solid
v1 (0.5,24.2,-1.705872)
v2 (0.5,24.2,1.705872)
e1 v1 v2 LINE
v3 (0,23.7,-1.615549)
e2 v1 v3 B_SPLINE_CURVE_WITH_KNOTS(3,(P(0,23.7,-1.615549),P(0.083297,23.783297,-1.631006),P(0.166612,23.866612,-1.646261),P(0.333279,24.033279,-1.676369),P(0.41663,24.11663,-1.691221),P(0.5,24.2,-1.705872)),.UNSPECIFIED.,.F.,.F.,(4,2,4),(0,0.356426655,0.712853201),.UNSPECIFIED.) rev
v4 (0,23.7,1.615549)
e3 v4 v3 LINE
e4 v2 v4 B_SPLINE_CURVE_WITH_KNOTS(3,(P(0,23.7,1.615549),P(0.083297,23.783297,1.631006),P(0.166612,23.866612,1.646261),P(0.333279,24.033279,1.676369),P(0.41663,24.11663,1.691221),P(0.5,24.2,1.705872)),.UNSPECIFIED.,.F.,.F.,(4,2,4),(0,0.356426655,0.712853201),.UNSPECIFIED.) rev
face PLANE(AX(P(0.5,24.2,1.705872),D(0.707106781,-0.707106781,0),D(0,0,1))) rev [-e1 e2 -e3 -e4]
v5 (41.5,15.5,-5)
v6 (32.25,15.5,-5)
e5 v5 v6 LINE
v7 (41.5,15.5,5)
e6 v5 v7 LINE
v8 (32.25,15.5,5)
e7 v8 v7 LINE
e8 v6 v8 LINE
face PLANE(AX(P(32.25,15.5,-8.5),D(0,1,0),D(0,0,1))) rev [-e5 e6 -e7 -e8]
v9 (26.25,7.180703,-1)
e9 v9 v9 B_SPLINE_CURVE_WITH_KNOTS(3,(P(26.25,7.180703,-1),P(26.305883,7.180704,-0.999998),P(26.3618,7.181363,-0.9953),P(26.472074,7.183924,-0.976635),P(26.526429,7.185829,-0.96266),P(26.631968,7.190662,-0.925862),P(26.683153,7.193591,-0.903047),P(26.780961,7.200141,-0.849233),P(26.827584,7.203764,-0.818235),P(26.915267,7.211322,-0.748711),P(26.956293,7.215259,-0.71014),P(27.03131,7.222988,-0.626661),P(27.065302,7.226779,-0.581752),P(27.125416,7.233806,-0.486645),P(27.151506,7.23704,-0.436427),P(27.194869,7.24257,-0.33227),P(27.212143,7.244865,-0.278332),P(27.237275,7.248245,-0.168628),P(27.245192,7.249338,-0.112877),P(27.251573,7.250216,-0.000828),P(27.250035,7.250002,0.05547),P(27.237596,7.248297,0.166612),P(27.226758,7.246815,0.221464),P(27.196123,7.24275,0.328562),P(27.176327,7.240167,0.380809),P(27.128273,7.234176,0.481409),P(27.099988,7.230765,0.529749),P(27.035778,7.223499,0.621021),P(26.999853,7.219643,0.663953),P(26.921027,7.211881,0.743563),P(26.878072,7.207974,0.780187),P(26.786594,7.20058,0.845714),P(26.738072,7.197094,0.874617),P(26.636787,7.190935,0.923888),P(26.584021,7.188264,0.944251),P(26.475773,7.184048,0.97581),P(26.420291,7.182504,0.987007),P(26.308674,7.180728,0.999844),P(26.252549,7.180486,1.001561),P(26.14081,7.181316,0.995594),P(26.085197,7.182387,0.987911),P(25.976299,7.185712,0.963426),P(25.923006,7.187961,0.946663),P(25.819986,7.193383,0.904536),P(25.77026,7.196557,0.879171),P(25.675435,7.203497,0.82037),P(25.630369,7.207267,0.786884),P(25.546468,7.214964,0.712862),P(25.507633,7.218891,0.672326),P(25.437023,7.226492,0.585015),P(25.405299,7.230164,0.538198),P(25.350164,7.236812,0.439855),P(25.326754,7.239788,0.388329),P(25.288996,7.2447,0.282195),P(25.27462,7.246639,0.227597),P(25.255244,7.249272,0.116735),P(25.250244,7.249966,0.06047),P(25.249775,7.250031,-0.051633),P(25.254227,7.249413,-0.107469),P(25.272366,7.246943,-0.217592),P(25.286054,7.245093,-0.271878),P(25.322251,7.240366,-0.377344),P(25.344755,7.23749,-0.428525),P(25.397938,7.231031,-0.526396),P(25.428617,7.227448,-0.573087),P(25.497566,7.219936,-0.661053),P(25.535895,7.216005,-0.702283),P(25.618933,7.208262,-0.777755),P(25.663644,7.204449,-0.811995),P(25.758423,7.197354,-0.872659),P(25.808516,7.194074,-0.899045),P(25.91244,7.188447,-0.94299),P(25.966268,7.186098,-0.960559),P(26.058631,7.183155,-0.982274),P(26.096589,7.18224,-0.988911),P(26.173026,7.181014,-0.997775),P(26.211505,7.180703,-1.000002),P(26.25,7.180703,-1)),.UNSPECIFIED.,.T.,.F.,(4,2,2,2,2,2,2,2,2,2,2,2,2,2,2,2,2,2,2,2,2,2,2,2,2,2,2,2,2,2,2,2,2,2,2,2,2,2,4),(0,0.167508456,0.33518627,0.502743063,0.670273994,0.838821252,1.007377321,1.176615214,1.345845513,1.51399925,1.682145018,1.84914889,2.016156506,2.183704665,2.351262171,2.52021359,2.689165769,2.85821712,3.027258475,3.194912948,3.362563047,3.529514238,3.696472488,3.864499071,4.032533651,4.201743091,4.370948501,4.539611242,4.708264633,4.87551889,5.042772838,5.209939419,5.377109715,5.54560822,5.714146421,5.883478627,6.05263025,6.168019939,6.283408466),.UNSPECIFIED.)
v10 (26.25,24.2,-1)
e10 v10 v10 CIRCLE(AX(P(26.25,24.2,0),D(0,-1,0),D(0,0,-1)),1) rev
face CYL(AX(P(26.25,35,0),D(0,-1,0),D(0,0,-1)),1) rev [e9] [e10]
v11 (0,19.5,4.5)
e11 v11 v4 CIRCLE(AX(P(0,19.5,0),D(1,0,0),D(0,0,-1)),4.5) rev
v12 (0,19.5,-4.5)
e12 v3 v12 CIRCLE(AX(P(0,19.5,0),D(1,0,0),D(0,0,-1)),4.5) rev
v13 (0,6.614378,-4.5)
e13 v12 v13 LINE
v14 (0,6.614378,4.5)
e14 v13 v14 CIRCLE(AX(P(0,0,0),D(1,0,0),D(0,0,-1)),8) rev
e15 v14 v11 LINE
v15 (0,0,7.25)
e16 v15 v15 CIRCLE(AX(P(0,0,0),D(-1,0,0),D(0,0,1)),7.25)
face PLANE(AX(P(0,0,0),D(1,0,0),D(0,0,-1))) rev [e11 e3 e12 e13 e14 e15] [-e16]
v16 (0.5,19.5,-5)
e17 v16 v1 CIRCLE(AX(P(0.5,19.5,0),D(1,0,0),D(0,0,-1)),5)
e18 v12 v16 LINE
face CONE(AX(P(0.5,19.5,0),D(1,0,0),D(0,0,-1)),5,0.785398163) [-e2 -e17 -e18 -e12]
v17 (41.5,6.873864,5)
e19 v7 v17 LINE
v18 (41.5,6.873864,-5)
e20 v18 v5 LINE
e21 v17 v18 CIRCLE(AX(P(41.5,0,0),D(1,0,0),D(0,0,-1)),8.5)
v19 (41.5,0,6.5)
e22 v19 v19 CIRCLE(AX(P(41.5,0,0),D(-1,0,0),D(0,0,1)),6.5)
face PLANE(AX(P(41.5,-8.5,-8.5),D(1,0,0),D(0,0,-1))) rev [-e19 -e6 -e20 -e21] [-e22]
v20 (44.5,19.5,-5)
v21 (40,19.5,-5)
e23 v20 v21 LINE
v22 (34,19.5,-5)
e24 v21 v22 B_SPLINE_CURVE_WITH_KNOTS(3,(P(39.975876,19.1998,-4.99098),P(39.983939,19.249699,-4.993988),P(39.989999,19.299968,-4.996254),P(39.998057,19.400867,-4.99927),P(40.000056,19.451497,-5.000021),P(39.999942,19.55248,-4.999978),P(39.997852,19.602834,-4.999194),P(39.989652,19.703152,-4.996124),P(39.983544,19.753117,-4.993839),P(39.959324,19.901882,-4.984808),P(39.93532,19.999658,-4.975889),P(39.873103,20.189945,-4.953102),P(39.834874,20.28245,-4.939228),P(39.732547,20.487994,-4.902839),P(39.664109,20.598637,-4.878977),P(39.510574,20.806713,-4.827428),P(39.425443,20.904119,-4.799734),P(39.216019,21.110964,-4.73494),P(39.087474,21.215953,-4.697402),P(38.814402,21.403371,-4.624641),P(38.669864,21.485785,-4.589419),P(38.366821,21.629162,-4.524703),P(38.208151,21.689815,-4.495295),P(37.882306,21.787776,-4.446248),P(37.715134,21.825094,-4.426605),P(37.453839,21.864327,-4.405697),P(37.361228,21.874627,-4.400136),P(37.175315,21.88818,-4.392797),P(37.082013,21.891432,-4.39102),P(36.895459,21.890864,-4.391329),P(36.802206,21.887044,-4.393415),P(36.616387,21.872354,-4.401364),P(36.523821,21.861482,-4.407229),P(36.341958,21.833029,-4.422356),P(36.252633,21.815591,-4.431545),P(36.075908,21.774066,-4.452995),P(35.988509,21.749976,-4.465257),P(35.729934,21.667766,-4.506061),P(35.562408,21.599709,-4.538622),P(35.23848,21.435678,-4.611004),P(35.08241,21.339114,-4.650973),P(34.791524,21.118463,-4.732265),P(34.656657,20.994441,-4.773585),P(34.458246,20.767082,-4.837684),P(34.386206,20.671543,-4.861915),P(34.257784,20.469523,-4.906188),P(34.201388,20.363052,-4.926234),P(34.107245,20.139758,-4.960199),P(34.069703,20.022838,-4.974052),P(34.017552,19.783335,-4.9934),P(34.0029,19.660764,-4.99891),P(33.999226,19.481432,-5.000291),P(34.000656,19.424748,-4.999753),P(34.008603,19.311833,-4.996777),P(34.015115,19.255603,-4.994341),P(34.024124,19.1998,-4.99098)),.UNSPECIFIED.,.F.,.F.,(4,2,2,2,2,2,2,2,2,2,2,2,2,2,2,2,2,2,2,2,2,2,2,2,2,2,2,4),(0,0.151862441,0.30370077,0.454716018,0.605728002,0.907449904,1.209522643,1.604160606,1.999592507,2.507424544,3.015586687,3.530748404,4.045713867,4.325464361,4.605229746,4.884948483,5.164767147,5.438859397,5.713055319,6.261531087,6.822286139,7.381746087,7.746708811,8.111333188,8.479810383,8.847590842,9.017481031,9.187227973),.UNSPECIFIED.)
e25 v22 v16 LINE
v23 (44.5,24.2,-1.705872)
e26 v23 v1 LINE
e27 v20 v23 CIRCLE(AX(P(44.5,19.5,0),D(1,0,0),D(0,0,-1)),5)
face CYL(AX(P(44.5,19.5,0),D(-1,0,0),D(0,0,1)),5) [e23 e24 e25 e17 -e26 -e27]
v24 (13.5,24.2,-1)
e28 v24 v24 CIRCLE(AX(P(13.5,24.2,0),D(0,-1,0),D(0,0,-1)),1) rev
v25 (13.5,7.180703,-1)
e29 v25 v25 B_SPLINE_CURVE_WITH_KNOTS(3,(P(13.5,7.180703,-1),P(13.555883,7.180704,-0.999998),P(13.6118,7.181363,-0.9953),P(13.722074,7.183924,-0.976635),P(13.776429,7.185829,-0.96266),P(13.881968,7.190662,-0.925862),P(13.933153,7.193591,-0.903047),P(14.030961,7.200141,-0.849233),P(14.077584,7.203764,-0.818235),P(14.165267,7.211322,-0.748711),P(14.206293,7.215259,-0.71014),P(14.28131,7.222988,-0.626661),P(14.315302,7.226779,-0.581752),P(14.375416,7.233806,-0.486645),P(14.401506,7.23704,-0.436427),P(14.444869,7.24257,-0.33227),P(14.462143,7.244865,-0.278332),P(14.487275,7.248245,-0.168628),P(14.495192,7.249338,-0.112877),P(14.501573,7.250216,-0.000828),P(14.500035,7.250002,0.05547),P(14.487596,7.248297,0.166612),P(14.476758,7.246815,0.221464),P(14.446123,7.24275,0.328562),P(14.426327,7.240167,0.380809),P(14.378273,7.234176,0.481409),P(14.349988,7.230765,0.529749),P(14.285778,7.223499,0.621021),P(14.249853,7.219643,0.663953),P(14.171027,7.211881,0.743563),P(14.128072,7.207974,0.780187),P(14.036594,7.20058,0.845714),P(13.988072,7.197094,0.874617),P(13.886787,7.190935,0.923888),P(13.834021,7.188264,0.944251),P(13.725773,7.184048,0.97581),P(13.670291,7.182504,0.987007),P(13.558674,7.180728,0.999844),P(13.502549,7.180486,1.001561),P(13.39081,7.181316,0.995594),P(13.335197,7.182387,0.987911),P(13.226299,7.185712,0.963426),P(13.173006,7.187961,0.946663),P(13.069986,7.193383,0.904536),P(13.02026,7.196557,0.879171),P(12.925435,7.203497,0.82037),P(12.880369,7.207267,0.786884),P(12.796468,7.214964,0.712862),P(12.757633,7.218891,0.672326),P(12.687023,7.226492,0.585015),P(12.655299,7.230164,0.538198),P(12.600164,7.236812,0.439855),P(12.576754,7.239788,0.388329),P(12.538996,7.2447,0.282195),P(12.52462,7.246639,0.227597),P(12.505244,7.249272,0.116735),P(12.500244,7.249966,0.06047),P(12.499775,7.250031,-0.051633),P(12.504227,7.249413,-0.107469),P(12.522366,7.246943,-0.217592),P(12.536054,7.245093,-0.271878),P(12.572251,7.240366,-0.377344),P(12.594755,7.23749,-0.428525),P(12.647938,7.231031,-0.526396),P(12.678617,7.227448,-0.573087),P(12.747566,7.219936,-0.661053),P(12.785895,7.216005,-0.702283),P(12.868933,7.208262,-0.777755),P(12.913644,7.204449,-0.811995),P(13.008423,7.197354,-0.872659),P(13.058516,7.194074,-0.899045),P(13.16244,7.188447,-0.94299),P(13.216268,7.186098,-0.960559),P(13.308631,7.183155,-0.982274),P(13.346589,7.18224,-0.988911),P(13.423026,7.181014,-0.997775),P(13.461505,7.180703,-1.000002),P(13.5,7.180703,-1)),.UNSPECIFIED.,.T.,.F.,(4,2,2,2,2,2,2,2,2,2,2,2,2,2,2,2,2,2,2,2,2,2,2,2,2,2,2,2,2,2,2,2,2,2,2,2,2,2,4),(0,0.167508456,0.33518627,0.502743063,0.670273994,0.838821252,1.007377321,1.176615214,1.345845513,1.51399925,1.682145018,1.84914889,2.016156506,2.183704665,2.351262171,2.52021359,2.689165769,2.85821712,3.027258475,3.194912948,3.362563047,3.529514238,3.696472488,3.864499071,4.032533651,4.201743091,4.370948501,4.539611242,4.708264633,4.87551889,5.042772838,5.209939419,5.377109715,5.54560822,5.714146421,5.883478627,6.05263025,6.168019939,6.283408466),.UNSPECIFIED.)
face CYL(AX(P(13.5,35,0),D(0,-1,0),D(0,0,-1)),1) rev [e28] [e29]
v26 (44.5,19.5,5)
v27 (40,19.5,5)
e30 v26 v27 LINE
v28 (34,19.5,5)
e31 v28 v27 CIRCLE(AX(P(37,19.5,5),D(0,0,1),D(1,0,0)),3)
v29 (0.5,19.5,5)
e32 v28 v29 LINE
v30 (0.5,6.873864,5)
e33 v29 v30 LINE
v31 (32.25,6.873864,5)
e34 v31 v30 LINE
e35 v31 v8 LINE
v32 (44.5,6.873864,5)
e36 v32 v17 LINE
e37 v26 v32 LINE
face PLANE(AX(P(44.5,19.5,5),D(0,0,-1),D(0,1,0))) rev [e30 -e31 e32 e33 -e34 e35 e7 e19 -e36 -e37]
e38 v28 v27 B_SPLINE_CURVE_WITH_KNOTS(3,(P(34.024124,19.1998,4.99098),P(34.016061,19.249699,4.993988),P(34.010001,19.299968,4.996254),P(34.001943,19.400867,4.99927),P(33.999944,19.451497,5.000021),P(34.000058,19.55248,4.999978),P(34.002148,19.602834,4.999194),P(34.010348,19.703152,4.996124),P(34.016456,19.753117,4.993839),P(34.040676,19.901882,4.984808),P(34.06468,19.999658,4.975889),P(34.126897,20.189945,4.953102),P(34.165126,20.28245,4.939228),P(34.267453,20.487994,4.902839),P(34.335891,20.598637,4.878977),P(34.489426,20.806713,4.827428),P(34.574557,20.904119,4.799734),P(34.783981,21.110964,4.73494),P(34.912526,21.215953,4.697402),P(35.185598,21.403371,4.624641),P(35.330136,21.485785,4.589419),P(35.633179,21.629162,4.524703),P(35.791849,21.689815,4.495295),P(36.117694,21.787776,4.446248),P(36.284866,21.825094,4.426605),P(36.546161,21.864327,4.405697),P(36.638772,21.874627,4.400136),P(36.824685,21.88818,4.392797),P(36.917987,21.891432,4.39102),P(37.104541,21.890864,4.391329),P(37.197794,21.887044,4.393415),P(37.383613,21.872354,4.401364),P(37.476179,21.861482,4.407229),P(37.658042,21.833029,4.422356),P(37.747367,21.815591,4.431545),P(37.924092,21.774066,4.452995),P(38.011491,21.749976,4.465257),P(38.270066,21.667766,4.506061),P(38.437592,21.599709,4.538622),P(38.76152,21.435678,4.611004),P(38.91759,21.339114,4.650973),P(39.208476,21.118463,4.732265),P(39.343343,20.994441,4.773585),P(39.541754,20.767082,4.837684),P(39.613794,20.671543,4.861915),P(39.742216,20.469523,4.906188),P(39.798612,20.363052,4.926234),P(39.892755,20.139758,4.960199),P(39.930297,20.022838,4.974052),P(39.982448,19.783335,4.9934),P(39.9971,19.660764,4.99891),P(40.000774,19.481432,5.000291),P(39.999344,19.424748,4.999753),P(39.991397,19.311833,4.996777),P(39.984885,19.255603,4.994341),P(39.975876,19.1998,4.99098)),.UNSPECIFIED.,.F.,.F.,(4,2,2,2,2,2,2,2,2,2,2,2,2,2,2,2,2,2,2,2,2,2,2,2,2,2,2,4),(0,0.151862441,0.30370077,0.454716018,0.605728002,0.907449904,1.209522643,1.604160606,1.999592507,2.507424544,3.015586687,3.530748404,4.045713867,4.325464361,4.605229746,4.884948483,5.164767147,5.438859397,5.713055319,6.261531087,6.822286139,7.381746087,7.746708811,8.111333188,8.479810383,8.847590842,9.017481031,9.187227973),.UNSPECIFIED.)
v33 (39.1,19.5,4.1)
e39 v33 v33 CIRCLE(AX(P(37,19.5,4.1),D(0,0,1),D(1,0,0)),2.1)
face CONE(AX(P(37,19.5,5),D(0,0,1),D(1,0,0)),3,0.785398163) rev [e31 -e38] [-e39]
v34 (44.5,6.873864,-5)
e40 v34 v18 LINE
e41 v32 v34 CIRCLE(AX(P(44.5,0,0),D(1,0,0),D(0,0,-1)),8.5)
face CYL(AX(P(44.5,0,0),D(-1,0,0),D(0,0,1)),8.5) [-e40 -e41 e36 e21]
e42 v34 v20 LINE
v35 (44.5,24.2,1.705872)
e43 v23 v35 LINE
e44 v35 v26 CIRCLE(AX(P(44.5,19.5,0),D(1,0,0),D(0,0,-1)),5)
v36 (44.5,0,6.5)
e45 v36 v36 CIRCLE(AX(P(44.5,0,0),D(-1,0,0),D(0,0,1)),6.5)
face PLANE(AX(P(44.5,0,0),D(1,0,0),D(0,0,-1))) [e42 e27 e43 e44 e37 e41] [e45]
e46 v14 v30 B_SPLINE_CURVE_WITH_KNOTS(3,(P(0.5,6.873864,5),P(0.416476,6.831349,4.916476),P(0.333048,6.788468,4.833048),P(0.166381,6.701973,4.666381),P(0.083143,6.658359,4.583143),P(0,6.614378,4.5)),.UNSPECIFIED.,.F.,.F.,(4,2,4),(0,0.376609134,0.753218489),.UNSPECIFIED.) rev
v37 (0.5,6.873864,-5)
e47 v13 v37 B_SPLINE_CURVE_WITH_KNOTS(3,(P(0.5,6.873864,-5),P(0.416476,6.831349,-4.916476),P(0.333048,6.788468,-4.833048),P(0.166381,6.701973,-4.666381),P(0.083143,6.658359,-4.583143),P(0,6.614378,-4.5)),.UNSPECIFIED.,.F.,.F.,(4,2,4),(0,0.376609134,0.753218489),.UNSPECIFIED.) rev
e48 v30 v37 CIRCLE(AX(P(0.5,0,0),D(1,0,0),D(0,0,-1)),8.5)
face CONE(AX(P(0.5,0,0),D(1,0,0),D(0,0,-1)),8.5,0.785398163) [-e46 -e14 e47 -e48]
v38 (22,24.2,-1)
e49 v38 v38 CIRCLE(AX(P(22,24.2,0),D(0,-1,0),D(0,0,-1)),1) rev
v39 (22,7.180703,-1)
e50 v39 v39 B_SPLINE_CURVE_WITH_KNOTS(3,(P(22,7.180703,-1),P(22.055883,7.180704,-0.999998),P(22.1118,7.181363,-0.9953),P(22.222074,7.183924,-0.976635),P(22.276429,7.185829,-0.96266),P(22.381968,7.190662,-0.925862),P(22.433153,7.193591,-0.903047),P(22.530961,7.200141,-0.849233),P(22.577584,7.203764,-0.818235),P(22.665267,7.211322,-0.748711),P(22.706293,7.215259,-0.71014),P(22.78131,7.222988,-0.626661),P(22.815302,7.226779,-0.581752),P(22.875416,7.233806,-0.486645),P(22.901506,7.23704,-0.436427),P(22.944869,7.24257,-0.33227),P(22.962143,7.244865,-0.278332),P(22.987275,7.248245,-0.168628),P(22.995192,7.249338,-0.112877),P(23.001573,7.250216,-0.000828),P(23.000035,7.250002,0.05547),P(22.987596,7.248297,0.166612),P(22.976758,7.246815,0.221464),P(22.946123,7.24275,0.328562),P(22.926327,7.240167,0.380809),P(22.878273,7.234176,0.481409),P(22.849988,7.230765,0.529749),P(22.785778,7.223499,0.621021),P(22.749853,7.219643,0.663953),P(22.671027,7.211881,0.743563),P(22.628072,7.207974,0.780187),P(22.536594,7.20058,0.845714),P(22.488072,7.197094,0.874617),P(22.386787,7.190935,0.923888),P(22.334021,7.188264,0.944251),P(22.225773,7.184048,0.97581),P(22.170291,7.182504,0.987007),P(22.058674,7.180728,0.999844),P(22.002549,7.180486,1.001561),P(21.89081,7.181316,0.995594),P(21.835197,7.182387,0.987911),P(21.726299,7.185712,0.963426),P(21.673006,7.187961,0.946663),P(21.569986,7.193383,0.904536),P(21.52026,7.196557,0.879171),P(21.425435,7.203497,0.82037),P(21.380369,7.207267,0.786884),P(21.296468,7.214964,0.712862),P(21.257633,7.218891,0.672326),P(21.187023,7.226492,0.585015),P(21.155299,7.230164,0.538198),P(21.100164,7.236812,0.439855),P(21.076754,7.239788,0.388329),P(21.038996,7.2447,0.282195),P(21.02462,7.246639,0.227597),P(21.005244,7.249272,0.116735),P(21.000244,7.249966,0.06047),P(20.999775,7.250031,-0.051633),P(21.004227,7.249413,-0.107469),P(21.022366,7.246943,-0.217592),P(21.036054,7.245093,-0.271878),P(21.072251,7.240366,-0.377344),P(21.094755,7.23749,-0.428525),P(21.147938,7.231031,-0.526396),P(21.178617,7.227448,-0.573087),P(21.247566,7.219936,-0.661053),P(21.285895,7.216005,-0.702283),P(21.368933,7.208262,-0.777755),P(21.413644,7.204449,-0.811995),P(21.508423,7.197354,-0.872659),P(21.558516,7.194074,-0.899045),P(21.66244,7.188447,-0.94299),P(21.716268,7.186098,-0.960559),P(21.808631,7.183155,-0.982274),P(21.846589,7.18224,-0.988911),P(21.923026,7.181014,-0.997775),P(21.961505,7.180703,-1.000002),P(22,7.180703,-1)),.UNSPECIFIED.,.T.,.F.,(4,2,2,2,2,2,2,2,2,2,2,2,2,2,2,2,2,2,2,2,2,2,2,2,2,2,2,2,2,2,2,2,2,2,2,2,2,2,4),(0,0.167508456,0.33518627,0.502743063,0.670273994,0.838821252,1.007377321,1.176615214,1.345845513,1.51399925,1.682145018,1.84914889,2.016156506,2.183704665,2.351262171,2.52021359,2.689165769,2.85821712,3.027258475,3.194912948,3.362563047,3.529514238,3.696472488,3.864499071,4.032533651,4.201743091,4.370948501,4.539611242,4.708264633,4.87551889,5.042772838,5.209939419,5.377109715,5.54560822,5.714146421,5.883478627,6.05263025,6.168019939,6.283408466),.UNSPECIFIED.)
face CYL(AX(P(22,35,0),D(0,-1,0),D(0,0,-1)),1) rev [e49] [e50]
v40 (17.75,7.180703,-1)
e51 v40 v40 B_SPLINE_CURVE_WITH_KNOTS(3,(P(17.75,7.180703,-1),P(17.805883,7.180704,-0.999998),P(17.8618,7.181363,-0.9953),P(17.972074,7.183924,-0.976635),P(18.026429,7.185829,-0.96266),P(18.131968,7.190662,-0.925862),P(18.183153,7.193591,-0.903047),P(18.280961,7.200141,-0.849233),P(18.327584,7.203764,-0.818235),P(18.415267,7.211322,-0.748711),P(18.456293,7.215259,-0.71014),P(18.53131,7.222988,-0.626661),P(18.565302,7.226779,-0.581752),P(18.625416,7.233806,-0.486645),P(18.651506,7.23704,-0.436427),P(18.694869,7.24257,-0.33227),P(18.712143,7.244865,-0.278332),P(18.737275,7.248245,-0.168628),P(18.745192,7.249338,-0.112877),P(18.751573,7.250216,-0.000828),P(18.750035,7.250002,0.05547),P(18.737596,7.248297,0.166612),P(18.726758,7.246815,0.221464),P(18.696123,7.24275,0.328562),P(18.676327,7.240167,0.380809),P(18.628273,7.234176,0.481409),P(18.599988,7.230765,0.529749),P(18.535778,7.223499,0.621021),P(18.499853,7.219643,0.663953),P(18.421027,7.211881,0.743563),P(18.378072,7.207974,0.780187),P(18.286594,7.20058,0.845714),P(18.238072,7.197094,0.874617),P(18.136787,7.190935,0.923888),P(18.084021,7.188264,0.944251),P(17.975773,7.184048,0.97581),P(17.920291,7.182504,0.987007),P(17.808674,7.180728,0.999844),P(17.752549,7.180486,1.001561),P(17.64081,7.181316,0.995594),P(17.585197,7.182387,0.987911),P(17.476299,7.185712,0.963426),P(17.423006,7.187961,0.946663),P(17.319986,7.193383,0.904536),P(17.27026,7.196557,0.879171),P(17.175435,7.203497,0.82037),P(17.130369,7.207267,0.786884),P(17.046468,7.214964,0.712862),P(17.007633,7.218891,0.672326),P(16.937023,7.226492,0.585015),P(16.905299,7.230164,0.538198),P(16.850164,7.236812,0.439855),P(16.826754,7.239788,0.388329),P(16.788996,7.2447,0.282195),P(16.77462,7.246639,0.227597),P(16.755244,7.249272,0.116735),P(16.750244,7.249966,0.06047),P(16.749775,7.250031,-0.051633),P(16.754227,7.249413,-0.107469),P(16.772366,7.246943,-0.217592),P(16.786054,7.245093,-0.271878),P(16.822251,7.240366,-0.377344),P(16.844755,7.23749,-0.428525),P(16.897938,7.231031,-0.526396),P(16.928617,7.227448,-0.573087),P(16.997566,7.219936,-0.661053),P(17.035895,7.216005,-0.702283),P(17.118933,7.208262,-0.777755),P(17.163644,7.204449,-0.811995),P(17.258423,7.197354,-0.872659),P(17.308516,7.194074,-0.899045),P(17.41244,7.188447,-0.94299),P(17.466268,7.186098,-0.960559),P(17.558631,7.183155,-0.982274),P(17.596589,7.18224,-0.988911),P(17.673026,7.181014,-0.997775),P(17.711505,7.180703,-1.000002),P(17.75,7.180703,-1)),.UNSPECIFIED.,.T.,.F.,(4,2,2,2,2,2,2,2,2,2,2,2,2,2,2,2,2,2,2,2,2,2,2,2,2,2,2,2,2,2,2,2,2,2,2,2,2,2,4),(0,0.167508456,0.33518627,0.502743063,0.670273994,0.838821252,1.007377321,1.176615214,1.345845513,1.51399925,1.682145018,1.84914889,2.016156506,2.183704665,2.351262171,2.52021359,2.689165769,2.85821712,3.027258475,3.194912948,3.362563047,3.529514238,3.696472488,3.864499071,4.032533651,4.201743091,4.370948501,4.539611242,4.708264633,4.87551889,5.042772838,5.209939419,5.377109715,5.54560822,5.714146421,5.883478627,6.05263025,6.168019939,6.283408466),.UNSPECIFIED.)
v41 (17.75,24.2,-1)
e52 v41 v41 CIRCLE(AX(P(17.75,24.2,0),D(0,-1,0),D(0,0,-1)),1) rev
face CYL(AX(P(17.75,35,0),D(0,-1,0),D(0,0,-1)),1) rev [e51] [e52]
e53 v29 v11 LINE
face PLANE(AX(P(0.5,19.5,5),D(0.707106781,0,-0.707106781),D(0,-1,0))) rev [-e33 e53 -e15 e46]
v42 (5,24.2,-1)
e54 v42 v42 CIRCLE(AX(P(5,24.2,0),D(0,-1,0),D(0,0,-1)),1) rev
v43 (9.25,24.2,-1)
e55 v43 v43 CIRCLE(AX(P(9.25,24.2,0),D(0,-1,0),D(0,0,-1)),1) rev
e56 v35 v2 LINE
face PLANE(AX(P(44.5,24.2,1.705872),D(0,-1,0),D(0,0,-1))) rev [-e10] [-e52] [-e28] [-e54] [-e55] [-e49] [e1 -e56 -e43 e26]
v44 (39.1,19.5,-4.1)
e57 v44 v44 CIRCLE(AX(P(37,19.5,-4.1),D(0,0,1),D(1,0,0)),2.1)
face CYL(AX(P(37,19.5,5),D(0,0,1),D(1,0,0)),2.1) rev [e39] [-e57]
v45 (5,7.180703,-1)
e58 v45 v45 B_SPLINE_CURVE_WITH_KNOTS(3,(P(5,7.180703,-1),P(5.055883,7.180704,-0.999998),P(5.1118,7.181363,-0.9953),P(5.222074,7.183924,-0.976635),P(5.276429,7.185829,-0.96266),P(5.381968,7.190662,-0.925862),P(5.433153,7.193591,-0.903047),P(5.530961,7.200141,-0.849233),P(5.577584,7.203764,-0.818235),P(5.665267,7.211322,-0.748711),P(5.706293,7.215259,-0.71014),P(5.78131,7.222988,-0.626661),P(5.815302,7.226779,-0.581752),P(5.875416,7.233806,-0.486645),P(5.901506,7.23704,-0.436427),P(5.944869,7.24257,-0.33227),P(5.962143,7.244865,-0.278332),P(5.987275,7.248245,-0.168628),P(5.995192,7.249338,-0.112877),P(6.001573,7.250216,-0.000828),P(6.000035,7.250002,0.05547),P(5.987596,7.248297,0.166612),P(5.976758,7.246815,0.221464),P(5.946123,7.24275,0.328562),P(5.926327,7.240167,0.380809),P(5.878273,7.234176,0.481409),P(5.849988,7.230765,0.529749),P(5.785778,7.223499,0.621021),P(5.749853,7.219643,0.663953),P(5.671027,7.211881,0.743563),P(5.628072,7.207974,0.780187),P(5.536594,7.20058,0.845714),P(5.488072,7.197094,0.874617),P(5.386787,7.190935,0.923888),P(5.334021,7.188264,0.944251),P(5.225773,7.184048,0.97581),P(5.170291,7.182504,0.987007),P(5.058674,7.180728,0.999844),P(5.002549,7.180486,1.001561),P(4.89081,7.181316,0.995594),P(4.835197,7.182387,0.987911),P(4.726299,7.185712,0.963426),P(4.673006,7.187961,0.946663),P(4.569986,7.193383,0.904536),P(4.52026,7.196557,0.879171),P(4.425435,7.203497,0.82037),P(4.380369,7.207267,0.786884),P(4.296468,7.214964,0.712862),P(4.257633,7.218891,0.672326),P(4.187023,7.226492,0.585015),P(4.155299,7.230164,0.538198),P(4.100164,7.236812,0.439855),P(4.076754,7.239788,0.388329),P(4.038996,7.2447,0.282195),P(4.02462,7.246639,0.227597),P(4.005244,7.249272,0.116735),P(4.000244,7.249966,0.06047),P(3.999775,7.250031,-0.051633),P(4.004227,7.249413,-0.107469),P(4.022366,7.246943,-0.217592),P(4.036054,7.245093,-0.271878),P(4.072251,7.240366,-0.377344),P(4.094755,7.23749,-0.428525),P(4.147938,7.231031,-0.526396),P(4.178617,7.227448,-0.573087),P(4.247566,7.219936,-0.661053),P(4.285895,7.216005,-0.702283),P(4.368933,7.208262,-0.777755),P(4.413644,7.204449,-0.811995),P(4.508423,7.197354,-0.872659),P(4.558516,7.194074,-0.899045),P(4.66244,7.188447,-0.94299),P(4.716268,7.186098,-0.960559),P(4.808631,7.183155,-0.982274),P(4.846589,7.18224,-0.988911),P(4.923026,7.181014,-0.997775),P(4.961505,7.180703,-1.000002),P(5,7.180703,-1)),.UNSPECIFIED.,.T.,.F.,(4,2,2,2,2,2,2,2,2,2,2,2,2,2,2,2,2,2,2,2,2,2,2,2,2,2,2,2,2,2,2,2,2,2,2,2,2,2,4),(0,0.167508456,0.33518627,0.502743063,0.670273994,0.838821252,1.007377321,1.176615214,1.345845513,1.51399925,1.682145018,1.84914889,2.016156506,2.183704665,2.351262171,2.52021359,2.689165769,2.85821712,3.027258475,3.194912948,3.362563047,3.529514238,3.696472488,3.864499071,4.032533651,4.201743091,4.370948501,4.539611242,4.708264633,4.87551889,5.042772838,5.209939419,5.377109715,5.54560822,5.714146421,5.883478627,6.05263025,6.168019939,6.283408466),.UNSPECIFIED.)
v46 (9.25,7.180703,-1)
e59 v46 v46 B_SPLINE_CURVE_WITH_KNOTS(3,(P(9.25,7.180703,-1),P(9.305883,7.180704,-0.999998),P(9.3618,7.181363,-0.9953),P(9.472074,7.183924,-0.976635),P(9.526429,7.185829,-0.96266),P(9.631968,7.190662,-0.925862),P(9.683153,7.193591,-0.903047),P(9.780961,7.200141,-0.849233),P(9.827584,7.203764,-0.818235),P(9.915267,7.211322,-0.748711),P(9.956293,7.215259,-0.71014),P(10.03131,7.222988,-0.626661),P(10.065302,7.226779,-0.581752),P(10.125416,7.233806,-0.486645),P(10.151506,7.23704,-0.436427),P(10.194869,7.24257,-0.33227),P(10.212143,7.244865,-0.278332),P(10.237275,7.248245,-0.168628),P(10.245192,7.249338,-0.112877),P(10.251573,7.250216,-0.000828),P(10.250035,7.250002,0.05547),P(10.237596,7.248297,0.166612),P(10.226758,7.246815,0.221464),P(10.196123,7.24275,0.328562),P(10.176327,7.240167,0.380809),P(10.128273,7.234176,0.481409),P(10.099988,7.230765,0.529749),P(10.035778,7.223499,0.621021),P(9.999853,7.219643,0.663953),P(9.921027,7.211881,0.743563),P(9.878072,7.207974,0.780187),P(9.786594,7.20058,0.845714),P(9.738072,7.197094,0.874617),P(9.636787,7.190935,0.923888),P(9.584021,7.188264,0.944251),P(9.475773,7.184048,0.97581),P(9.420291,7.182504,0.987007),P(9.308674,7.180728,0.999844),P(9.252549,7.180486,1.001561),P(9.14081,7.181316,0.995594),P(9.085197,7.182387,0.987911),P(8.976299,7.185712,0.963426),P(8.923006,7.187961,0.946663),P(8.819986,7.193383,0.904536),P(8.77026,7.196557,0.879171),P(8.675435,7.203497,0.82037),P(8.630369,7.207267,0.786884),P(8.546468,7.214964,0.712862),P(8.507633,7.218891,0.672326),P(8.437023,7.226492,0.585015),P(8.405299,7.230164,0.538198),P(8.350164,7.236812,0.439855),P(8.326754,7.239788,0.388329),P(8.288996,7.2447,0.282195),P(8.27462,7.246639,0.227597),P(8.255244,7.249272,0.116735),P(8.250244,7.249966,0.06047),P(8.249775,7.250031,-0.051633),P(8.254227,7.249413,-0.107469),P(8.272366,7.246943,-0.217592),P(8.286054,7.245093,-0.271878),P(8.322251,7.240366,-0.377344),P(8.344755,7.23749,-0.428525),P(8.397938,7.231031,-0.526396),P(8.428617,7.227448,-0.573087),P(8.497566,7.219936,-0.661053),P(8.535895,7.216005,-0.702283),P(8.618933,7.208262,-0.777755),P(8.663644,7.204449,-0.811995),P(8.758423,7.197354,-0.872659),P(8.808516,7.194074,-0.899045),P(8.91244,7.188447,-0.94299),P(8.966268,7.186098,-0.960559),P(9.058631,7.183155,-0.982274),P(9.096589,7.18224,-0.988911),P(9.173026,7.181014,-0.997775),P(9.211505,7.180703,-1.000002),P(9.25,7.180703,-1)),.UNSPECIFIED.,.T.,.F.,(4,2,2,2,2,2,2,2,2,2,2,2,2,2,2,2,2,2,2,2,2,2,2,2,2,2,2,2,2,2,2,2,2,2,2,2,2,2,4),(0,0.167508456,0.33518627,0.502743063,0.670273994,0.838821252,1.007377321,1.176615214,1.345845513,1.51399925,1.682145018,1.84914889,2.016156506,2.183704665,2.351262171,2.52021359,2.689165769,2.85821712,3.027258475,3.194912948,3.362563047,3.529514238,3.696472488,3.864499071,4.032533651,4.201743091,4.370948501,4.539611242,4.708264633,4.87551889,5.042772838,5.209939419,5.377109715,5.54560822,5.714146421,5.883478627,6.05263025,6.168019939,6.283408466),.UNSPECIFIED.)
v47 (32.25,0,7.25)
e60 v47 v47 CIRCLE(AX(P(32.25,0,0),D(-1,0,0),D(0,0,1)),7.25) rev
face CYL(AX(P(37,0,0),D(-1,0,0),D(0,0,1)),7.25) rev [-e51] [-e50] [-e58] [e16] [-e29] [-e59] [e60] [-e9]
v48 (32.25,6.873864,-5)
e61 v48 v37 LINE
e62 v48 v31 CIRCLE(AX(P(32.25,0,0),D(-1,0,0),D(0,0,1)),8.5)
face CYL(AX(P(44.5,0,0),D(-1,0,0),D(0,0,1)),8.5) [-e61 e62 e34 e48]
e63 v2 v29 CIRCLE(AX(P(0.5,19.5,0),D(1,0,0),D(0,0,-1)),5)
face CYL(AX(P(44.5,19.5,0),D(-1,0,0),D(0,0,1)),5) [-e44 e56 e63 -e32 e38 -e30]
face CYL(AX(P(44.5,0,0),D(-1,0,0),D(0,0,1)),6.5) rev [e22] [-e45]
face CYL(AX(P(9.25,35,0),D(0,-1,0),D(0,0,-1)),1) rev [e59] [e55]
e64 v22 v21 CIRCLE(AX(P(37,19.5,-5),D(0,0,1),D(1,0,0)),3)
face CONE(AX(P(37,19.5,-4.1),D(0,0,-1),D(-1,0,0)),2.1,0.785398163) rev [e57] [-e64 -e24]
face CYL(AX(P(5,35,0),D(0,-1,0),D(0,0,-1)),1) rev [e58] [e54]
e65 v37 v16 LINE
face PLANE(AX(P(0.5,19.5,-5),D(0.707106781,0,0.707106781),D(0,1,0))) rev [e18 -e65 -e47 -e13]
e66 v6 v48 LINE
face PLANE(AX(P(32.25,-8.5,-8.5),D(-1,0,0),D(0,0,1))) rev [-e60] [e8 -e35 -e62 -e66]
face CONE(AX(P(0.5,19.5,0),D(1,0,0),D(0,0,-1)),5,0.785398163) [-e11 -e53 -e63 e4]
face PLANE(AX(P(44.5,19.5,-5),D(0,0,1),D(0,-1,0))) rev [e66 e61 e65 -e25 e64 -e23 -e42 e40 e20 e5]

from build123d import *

# Parameters (mm, degrees)
EURO_CYLINDER_OUTLINE_DEPTH = 44.5
SKETCH9_R                   = 7.25
BORE_FOR_CORE_DEPTH         = 37
SKETCH2_R                   = 1
HOLE_FOR_PIN_DEPTH          = 35
LPATTERN_OF_6_COUNT         = 6
LPATTERN_OF_6_PITCH         = 4.25
OPENNING_DEPTH              = 53.422705051
OPENNING_DEPTH_BACK         = 53.422705051
SKETCH3_W                   = 9.25
SKETCH3_H                   = 24
F_0_5_X_45_DEG_SIZE         = 0.5
SKETCH10_R                  = 6.5
DIA_13_END_BIT_DEPTH        = 49.786678644


with BuildPart() as part:
    # Sketch1 → euro cylinder outline (new body)
    with BuildSketch(Plane(origin=(0, 0, 0), x_dir=(0, 0, -1), z_dir=(1, 0, 0))):
        with BuildLine():
            Line((-5, 19.5), (-5, 6.873863542))
            ThreePointArc((-5, 6.873863542), (0, -8.5), (5, 6.873863542))
            Line((5, 6.873863542), (5, 19.5))
            ThreePointArc((5, 19.5), (4.094469505, 22.369724634), (1.705872211, 24.2))
            Line((1.705872211, 24.2), (-1.705872211, 24.2))
            ThreePointArc((-1.705872211, 24.2), (-4.094469505, 22.369724634), (-5, 19.5))
        make_face()
    extrude(amount=EURO_CYLINDER_OUTLINE_DEPTH)

    # Sketch9 → bore for core (cut)
    with BuildSketch(Plane.ZY):
        Circle(SKETCH9_R)
    extrude(amount=-BORE_FOR_CORE_DEPTH, mode=Mode.SUBTRACT)

    # Sketch2 → hole for pin (cut)
    with BuildSketch(Plane(origin=(0, 0, 0), x_dir=(1, 0, 0), z_dir=(0, 1, 0))):
        with Locations(Location((5, 0, 0), (0, 0, 90))):
            Circle(SKETCH2_R)
    hole_for_pin = extrude(amount=HOLE_FOR_PIN_DEPTH, mode=Mode.SUBTRACT)

    # LPattern of 6: hole for pin ×6
    with Locations(*[(i * LPATTERN_OF_6_PITCH, 0, 0) for i in range(1, LPATTERN_OF_6_COUNT)]):
        add(hole_for_pin, mode=Mode.SUBTRACT)

    # Sketch3 → openning (cut, two sides: drawn at the far end of the back side and taken through both)
    with BuildSketch(Plane.XY.offset(5).offset(-OPENNING_DEPTH_BACK)):
        with Locations((36.875, 3.5)):
            Rectangle(SKETCH3_W, SKETCH3_H)
    extrude(amount=OPENNING_DEPTH + OPENNING_DEPTH_BACK, mode=Mode.SUBTRACT)

    # Sketch7 → M5x0.8 mounting hole (revolve, cut)
    with BuildSketch(Plane(origin=(37, 19.5, 5), x_dir=(0, -1, 0), z_dir=(1, 0, 0))):
        Polygon((0, 0), (0, 10), (3, 10), (2.1, 9.1), (2.1, 0.9), (3, 0), align=None)
    revolve(axis=Axis((37, 19.5, 11.35), (0, 0, -1)), mode=Mode.SUBTRACT)

    # 0.5 x 45 deg
    f_0_5_x_45_deg_edges = [part.edges().sort_by_distance(p)[0] for p in [
        (0, 24.2, 0),
    ]]
    chamfer(f_0_5_x_45_deg_edges, length=F_0_5_X_45_DEG_SIZE)
    f_0_5_x_45_deg_2_edges = [part.edges().sort_by_distance(p)[0] for p in [
        (0, 21.891164992, -4.391164992),
        (0, 13.186931771, -5),
    ]]
    chamfer(f_0_5_x_45_deg_2_edges, length=F_0_5_X_45_DEG_SIZE)
    f_0_5_x_45_deg_3_edges = [part.edges().sort_by_distance(p)[0] for p in [
        (0, 21.891164992, 4.391164992),
        (0, 13.186931771, 5),
    ]]
    chamfer(f_0_5_x_45_deg_3_edges, length=F_0_5_X_45_DEG_SIZE)
    f_0_5_x_45_deg_4_edges = [part.edges().sort_by_distance(p)[0] for p in [
        (0, -8.5, 0),
    ]]
    chamfer(f_0_5_x_45_deg_4_edges, length=F_0_5_X_45_DEG_SIZE - 0.0001)  # a hair under: the kernel refuses the full size

    # Sketch10 → dia 13 end bit (cut, through all)
    with BuildSketch(Plane.ZY.offset(-41.5)):
        Circle(SKETCH10_R)
    extrude(amount=-DIA_13_END_BIT_DEPTH, mode=Mode.SUBTRACT)


solid = part.part
